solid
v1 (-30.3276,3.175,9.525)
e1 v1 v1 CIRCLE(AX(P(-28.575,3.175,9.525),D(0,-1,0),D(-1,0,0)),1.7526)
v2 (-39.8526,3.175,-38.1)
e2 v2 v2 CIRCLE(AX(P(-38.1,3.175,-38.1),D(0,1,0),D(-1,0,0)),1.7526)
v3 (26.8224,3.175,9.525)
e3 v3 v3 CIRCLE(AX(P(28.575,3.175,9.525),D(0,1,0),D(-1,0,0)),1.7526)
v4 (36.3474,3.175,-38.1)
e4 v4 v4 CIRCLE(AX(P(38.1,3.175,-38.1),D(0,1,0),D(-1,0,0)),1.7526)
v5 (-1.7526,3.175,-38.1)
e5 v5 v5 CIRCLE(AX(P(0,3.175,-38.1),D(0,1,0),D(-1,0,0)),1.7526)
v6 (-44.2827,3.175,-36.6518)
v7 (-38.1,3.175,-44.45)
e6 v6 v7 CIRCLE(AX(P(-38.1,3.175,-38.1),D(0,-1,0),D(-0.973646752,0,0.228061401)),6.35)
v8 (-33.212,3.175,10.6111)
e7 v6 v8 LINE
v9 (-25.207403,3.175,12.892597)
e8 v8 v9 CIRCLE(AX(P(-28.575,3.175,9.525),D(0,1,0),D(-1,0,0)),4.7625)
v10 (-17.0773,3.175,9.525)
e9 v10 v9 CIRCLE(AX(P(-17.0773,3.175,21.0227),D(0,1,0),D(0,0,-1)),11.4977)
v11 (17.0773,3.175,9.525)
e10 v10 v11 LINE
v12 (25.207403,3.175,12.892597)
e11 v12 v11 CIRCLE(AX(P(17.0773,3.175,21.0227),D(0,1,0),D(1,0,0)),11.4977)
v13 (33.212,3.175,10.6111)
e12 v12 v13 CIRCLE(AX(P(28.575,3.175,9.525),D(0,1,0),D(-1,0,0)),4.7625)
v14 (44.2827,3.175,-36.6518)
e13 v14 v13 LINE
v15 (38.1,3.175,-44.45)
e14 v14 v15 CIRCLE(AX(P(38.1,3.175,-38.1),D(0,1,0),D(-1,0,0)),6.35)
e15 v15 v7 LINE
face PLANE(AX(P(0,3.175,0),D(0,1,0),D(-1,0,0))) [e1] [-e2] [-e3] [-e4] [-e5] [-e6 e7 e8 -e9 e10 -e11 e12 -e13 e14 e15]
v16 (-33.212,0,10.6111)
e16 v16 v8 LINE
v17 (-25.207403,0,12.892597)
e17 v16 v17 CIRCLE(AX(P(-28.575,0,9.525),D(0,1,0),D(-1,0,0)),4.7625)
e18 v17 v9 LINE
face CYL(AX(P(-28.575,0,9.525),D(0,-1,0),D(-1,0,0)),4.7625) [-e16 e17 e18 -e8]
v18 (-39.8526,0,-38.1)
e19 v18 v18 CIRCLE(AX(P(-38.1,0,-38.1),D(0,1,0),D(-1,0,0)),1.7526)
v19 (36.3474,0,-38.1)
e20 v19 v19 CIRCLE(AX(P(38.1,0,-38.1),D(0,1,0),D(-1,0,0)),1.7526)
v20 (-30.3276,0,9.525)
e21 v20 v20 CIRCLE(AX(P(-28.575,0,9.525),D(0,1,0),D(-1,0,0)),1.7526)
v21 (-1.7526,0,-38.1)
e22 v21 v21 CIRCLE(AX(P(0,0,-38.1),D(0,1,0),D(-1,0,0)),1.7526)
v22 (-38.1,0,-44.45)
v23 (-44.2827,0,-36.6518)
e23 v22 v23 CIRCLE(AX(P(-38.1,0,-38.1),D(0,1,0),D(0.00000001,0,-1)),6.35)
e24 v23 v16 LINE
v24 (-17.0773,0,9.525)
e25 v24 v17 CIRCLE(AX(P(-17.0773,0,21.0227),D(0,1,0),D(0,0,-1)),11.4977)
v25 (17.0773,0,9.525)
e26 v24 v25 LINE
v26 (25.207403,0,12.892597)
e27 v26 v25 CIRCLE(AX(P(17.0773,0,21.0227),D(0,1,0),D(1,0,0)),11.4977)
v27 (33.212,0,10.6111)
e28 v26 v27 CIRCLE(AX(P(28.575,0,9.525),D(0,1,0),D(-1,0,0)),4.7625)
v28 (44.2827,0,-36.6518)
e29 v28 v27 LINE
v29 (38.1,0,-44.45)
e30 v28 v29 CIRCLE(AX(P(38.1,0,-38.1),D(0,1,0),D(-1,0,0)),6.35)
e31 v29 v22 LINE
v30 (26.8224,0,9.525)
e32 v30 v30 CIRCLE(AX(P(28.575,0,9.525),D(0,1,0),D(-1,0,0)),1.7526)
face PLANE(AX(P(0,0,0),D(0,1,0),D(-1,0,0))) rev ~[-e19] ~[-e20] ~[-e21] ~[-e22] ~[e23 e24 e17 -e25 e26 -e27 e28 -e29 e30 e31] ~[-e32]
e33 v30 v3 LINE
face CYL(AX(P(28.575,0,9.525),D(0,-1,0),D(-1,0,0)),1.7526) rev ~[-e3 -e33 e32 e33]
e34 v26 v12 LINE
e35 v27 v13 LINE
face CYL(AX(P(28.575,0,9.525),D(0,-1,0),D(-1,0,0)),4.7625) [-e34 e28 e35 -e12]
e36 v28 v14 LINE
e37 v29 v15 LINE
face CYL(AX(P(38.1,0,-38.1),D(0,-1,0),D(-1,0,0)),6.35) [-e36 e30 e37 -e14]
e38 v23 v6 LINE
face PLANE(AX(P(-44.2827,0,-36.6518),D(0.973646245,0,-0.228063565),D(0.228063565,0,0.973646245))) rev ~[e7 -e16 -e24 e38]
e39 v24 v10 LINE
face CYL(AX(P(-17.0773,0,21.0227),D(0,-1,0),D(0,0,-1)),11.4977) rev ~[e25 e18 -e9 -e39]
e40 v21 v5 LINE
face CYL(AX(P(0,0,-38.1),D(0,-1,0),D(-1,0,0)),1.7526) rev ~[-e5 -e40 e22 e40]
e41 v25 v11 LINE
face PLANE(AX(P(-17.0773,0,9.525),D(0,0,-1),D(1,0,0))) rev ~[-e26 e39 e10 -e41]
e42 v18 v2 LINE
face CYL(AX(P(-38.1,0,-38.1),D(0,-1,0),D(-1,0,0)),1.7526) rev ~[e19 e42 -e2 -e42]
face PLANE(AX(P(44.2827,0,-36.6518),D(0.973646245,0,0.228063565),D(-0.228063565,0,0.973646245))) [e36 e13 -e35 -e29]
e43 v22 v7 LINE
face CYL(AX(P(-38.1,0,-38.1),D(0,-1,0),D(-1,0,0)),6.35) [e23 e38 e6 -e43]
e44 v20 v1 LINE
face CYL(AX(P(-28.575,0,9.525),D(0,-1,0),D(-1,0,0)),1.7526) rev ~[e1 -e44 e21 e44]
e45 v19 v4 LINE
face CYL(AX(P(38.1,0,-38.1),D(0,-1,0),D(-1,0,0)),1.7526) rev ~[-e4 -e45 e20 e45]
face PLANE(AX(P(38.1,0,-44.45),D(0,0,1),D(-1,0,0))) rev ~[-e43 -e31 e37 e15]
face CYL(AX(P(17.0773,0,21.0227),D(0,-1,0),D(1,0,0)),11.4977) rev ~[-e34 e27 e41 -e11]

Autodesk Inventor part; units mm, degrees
ref_plane "YZ Plane" through (0, 0, 0) normal (1, 0, 0) x (0, 1, 0)
ref_plane "XZ Plane" through (0, 0, 0) normal (0, 1, 0) x (-1, 0, 0)
ref_plane "XY Plane" through (0, 0, 0) normal (0, 0, 1) x (1, 0, 0)
sketch "Sketch1" plane through (0, 0, 0) normal (0, 1, 0) x (-1, 0, 0)
  line L0 (101.6, 38.1) -> (-101.6, 38.1) construction
  line L1 (-101.6, 38.1) -> (-101.6, -38.1) construction
  line L2 (-101.6, -38.1) -> (101.6, -38.1) construction
  line L3 (101.6, -38.1) -> (101.6, 38.1) construction
  line L4 (101.6, 38.1) -> (-101.6, -38.1) construction
  line L5 (-101.6, 38.1) -> (101.6, -38.1) construction
  line L6 (-28.575, 66.675) -> (28.575, 66.675) construction
  line L7 (28.575, 66.675) -> (28.575, 9.525) construction
  line L8 (28.575, 9.525) -> (-28.575, 9.525)
  line L9 (-28.575, 9.525) -> (-28.575, 66.675) construction
  line L10 (-28.575, 66.675) -> (28.575, 9.525) construction
  line L11 (28.575, 66.675) -> (-28.575, 9.525) construction
  circle A0 centre (-38.1, 50.8) radius 3.175 construction
  line L12 (0, 38.1) -> (0, -38.1) construction
  circle A1 centre (-38.1, 50.8) radius 9.525 construction
  line L13 (-38.1, 60.325) -> (-28.575, 60.325) construction
  circle A2 centre (38.1, 50.8) radius 3.175 construction
  circle A3 centre (38.1, 50.8) radius 9.525 construction
  line L14 (38.1, 60.325) -> (28.575, 60.325) construction
  circle A4 centre (-76.2, -38.1) radius 1.7526 construction
  circle A5 centre (-95.25, 3.175) radius 1.7526 construction
  circle A6 centre (76.2, -38.1) radius 1.7526 construction
  circle A7 centre (95.25, 3.175) radius 1.7526 construction
  line L15 (-101.6, -38.1) -> (-101.6, 6.35) construction
  line L16 (-101.6, 6.35) -> (-44.4797, 57.8728) construction
  line L17 (101.6, -38.1) -> (101.6, 6.35) construction
  line L18 (101.6, 6.35) -> (44.4797, 57.8728) construction
  line L19 (-42.6417, 42.4275) -> (-87.975, 1.5367) construction
  line L20 (-87.975, 1.5367) -> (-87.975, -38.1) construction
  line L21 (87.975, -38.1) -> (87.975, 1.5367) construction
  line L22 (87.975, 1.5367) -> (42.6417, 42.4275) construction
  line L23 (0, -38.1) -> (-95.25, -38.1) construction
  line L24 (0, -38.1) -> (95.25, -38.1) construction
  circle A8 centre (-60.325, 35.0287) radius 1.7526 construction
  circle A9 centre (-33.3375, 31.75) radius 1.7526 construction
  line L25 (-38.1, 0) -> (-38.1, 41.275) construction
  line L26 (-38.1, 0) -> (0, 0) construction
  circle A10 centre (60.325, 35.0287) radius 1.7526 construction
  circle A11 centre (33.3375, 31.75) radius 1.7526 construction
  line L27 (38.1, 0) -> (38.1, 41.275) construction
  line L28 (38.1, 0) -> (0, 0) construction
  line L29 (-87.975, 0) -> (-65.115, 0) construction
  line L30 (-65.115, 0) -> (-65.115, -31.75) construction
  line L31 (-65.115, -31.75) -> (-87.975, -31.75) construction
  line L32 (-101.6, -38.1) -> (101.6, -38.1) construction
  line L33 (101.6, -38.1) -> (101.6, 19.05) construction
  line L34 (101.6, 19.05) -> (-101.6, 19.05) construction
  line L35 (-101.6, 19.05) -> (-101.6, -38.1) construction
  line L36 (-101.6, 19.05) -> (-87.5203, 19.05) construction
  line L37 (87.5203, 19.05) -> (101.6, 19.05) construction
  circle A12 centre (-38.1, 0) radius 3.175 construction
  circle A13 centre (-38.1, 0) radius 6.35 construction
  circle A14 centre (38.1, 0) radius 3.175 construction
  circle A15 centre (38.1, 0) radius 6.35 construction
  circle A16 centre (28.575, 9.525) radius 1.7526
  circle A17 centre (28.575, 9.525) radius 4.7625
  arc A18 (17.0773, 9.525) -> (28.575, 21.0227) centre (17.0773, 21.0227) ccw
  circle A19 centre (-28.575, 9.525) radius 1.7526
  circle A20 centre (-28.575, 9.525) radius 4.7625
  arc A21 (-28.575, 21.0227) -> (-17.0773, 9.525) centre (-17.0773, 21.0227) ccw
  arc A22 (31.4325, 5.715) -> (38.1, 19.05) centre (21.4312, 19.05) ccw construction
  arc A23 (-38.1, 19.05) -> (-31.4325, 5.715) centre (-21.4312, 19.05) ccw construction
  line L38 (-61.94, -38.1) -> (-61.94, 25.0204) construction
  line L39 (87.975, 0) -> (65.115, 0) construction
  line L40 (65.115, 0) -> (65.115, -31.75) construction
  line L41 (65.115, -31.75) -> (87.975, -31.75) construction
  line L42 (61.94, -38.1) -> (61.94, 25.0204) construction
  line L43 (-28.575, 4.7625) -> (28.575, 4.7625) construction
  line L44 (101.6, -31.75) -> (-101.6, -31.75) construction
  line L45 (-101.6, -31.75) -> (-101.6, -44.45) construction
  line L46 (-101.6, -44.45) -> (101.6, -44.45)
  line L47 (101.6, -44.45) -> (101.6, -31.75) construction
  circle A24 centre (0, -38.1) radius 1.7526
  circle A25 centre (38.1, -38.1) radius 1.7526
  circle A26 centre (-38.1, -38.1) radius 1.7526
  line L48 (101.6, -38.1) -> (76.2, -44.45) construction
  line L49 (-101.6, -38.1) -> (-76.2, -44.45) construction
  line L50 (76.2, -38.1) -> (76.2, -44.45) construction
  line L51 (-76.2, -38.1) -> (-76.2, -44.45) construction
  line L52 (59.1924, 41.2769) -> (32.488, 36.4361) construction
  circle A27 centre (60.325, 35.0287) radius 6.35 construction
  circle A28 centre (33.3375, 31.75) radius 4.7625 construction
  line L53 (-59.1924, 41.2769) -> (-32.488, 36.4361) construction
  circle A29 centre (-60.325, 35.0287) radius 6.35 construction
  circle A30 centre (-33.3375, 31.75) radius 4.7625 construction
  line L54 (-87.975, 0) -> (-65.115, 0) construction
  line L55 (-65.115, 0) -> (-65.115, -3.175) construction
  line L56 (-65.115, -3.175) -> (-87.975, -3.175) construction
  line L57 (-87.975, -3.175) -> (-87.975, 0) construction
  line L58 (-65.115, -15.875) -> (-87.975, -15.875) construction
  line L59 (-65.115, -28.575) -> (-87.975, -28.575) construction
  line L60 (-84.8, -38.1) -> (-84.8, 0.1248) construction
  line L61 (65.115, -3.175) -> (87.975, -3.175) construction
  line L62 (65.115, -15.875) -> (87.975, -15.875) construction
  line L63 (65.115, -28.575) -> (87.975, -28.575) construction
  line L64 (84.8, -38.1) -> (84.8, 0.1248) construction
  line L65 (-31.75, -31.75) -> (31.75, -31.75) construction
  line L66 (31.75, -31.75) -> (31.75, 0) construction
  line L67 (31.75, 0) -> (-31.75, 0) construction
  line L68 (-31.75, 0) -> (-31.75, -31.75) construction
  circle A31 centre (71.465, 12.7) radius 3.175 construction
  circle A32 centre (-71.465, 12.7) radius 3.175 construction
  circle A33 centre (38.1, -38.1) radius 6.35
  circle A34 centre (-38.1, -38.1) radius 6.35
  line L69 (44.2827, -36.6518) -> (33.212, 10.6111)
  line L70 (-44.2827, -36.6518) -> (-33.212, 10.6111)
  point P0 (28.575, 38.1)
  point P1 (-28.575, 38.1)
  point P2 (28.575, 60.325)
  point P3 (44.4797, 57.8728)
  point P4 (101.6, -15.875)
  point P5 (38.1, 41.275)
  point P6 (-87.975, -31.75)
  point P7 (-101.6, 6.35)
  point P8 (101.6, 6.35)
  point P9 (31.75, 0)
  point P10 (38.1, 6.35)
  point P11 (-38.1, 6.35)
  point P12 (-31.75, 0)
  point P13 (87.975, 0)
  point P14 (61.94, 25.0204)
  point P15 (-17.0773, 9.525)
  point P16 (-28.575, 21.0227)
  point P17 (-38.1, 19.05)
  point P18 (-31.4325, 5.715)
  point P19 (-21.8502, 0)
  point P20 (21.8502, 0)
  point P21 (-25.2074, 12.8926)
  point P22 (-28.575, 14.2875)
  point P23 (-23.8125, 9.525)
  point P24 (-28.575, 50.8)
  point P25 (25.2074, 12.8926)
  point P26 (28.575, 14.2875)
  point P27 (23.8125, 9.525)
  point P28 (28.575, 50.8)
  point P29 (26.8224, 9.525)
  point P30 (28.575, 11.2776)
  point P31 (61.94, -31.75)
  point P32 (-61.94, -31.75)
  point P33 (-28.575, 31.75)
  point P34 (-64.5781, 39.7439)
  point P35 (64.5781, 39.7439)
  point P36 (28.575, 31.75)
  point P37 (-84.8, -3.175)
  point P38 (-84.8, -28.575)
  point P39 (84.8, -3.175)
  point P40 (84.8, -28.575)
  point P41 (31.75, -31.75)
  point P42 (-101.6, -31.75)
  point P43 (31.75, -31.75)
  point P44 (-26.8224, 9.525)
  point P45 (-28.575, 11.2776)
  point P46 (-39.8526, -38.1)
  point P47 (-36.3474, -38.1)
  point P48 (-1.7526, -38.1)
  point P49 (1.7526, -38.1)
  point P50 (36.3474, -38.1)
  point P51 (39.8526, -38.1)
  point P52 (-38.1, -44.45)
  point P53 (38.1, -44.45)
  dimension "d2" = 3.175
  dimension "d3" = 0
  dimension "d0" = 203.2
  dimension "d1" = 76.2
  dimension "d4" = 57.15
  dimension "d6" = 6.35
  dimension "d7" = 38.1
  dimension "d8" = 19.05
  dimension "d10" = 3.5052
  dimension "d11" = 3.5052
  dimension "d12" = 0
  dimension "d14" = 25.4
  dimension "d15" = 6.35
  dimension "d20" = 50.8
  dimension "d21" = 41.275
  dimension "d22" = 44.45
  dimension "d24" = 12.7
  dimension "d25" = 13.625
  dimension "d26" = 12.7
  dimension "d27" = 13.625
  dimension "d31" = 3.5052
  dimension "d32" = 3.5052
  dimension "d33" = 6.35
  dimension "d34" = 31.75
  dimension "d35" = 4.7625
  dimension "d36" = 22.225
  dimension "d37" = 9.525
  dimension "d39" = 31.75
  dimension "d40" = 6.35
  dimension "d42" = 57.15
  dimension "d43" = 6.35
  dimension "d44" = 9.525
  dimension "d45" = 9.525
  dimension "d46" = 12.7
  dimension "d104" = 3.5052
  dimension "d105" = 9.525
  dimension "d106" = 3.175
  dimension "d107" = 22.86
  dimension "d123" = 88.9
  dimension "d124" = 12.7
  dimension "d125" = 3.5052
  dimension "d126" = 3.5052
  dimension "d127" = 38.1
  dimension "d128" = 28.575
  dimension "d129" = 3.175
  dimension "d130" = 3.175
  dimension "d131" = 31.75
  dimension "d132" = 31.75
  dimension "d133" = 31.75
  dimension "d135" = 6.35
  dimension "d136" = 12.7
  dimension "d137" = 9.525
extrude "Extrusion1" add sketch "Sketch1" along normal blind 3.175
equation "\"d35\" = 0.5 * d37"
properties part number "Chassis" material "UHMW, White"
